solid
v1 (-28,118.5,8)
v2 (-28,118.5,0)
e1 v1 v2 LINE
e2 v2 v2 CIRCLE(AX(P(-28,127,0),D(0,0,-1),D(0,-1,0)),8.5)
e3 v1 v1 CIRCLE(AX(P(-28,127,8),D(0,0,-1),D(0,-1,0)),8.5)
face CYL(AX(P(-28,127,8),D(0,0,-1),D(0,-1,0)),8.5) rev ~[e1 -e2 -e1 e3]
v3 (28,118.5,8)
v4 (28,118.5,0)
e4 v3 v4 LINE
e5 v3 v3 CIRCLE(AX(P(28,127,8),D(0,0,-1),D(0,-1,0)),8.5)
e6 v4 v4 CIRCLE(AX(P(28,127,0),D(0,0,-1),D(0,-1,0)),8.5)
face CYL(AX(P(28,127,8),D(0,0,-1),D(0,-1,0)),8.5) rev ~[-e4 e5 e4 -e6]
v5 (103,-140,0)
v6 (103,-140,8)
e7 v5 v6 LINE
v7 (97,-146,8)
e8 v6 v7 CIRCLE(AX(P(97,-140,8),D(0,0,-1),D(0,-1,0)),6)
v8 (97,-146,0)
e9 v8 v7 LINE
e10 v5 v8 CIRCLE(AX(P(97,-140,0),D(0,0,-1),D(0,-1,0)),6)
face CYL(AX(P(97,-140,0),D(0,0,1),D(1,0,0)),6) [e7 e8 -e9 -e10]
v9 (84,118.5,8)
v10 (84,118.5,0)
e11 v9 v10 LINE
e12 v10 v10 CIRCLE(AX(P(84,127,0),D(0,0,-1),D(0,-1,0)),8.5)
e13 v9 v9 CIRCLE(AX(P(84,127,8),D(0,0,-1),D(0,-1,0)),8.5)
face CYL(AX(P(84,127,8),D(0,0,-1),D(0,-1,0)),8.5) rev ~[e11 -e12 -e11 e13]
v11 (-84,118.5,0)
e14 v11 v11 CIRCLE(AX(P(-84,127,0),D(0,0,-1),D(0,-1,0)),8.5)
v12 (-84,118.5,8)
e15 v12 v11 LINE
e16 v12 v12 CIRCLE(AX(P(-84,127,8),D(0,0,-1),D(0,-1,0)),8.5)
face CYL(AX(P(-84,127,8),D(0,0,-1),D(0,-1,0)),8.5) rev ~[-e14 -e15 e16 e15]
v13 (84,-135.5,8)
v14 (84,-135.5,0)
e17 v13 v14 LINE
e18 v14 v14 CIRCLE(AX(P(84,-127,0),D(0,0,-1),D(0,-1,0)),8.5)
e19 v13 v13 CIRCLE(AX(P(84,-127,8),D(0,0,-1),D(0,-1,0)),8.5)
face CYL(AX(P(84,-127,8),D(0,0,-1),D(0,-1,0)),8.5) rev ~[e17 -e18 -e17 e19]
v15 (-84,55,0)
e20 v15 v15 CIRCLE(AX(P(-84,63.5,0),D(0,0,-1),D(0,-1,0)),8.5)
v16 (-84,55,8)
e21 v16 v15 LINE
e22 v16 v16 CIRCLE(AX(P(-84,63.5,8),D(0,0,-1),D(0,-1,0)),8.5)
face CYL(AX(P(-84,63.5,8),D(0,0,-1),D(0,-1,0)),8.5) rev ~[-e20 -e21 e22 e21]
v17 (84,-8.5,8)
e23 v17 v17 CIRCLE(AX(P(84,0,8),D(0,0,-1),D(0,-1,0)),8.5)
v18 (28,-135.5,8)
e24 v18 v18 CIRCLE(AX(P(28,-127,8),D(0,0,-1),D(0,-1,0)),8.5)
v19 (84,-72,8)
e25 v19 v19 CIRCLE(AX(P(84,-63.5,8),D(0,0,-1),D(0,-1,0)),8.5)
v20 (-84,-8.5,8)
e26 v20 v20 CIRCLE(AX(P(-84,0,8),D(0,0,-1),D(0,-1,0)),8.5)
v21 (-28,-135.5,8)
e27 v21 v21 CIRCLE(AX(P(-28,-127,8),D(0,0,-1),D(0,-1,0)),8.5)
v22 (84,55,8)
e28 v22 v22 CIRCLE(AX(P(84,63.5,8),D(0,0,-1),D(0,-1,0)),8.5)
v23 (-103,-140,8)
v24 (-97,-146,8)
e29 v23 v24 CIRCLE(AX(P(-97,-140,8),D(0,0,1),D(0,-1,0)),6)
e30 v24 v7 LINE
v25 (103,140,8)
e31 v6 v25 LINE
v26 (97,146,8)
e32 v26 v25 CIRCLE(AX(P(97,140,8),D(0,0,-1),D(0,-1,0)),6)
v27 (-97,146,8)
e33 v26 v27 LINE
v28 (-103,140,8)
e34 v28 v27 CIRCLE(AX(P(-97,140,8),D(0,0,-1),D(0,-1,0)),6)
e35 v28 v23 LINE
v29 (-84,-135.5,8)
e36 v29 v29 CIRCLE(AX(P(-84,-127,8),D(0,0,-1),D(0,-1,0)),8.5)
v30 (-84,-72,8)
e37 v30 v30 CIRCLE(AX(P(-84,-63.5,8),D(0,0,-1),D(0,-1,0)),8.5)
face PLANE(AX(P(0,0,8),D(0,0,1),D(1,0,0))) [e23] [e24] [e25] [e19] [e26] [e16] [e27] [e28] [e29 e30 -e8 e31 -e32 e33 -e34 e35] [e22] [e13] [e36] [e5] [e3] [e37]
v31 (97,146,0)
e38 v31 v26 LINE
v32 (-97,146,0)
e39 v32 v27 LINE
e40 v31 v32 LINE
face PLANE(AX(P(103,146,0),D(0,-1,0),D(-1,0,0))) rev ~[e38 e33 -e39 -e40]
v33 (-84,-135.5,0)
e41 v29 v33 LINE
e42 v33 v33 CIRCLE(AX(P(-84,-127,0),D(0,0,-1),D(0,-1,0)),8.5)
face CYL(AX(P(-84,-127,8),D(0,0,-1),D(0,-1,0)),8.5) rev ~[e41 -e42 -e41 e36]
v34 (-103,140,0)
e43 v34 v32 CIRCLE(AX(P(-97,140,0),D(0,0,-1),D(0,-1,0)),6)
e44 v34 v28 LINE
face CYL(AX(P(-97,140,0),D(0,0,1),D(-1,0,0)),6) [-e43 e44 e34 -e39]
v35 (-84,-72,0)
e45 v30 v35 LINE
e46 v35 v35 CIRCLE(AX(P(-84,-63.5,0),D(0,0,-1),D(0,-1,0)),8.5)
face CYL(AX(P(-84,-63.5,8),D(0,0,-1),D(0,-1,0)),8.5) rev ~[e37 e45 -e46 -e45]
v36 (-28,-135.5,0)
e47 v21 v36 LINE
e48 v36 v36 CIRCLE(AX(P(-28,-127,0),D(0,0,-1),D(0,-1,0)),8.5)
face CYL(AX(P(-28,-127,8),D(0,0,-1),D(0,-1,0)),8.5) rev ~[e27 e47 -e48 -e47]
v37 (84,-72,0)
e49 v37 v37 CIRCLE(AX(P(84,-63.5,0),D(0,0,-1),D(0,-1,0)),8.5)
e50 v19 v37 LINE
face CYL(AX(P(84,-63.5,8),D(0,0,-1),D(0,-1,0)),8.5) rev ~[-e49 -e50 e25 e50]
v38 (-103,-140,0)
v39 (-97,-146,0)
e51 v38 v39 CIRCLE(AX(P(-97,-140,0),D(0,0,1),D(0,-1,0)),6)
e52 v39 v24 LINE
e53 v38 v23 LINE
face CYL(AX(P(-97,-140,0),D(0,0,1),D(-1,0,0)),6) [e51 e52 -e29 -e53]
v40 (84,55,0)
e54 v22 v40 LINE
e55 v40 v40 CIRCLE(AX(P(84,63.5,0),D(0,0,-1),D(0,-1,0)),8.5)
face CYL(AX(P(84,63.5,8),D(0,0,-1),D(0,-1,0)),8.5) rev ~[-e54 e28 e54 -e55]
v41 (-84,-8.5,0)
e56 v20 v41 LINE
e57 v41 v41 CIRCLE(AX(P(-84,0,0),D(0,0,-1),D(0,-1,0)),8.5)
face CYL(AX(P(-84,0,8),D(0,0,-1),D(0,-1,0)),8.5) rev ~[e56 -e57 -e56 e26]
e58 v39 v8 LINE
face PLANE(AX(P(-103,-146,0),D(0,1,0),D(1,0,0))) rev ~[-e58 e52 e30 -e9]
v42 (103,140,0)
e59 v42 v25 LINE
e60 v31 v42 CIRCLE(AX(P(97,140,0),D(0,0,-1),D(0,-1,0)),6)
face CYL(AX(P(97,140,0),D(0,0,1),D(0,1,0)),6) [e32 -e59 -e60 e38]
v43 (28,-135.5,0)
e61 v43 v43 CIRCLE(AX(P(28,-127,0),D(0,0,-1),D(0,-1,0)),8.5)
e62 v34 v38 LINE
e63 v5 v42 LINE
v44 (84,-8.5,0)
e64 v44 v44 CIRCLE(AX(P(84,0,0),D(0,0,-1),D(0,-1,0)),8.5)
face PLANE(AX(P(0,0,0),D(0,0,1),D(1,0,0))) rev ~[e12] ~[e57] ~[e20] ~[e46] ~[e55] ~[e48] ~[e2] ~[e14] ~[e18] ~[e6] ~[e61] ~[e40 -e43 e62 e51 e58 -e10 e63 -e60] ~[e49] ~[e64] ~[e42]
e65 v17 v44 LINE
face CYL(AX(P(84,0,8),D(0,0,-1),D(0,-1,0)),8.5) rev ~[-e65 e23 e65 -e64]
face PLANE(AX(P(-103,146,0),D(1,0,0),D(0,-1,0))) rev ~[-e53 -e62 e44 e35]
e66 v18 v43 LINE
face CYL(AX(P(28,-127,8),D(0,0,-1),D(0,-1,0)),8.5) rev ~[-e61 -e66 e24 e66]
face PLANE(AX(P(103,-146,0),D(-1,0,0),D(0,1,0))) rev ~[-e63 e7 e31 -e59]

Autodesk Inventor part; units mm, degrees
ref_plane "YZ Plane" through (0, 0, 0) normal (1, 0, 0) x (0, 1, 0)
ref_plane "XZ Plane" through (0, 0, 0) normal (0, 1, 0) x (-1, 0, 0)
ref_plane "XY Plane" through (0, 0, 0) normal (0, 0, 1) x (1, 0, 0)
sketch "Sketch2" plane through (0, 0, 0) normal (0, 0, 1) x (1, 0, 0)
  line L0 (-53, -96) -> (53, -96)
  line L1 (53, -96) -> (53, 96)
  line L2 (53, 96) -> (-53, 96)
  line L3 (-53, 96) -> (-53, -96)
  line L4 (-53, -96) -> (53, 96) construction
  line L5 (53, -96) -> (-53, 96) construction
  line L6 (-103, -146) -> (103, -146)
  line L7 (103, -146) -> (103, 146)
  line L8 (103, 146) -> (-103, 146)
  line L9 (-103, 146) -> (-103, -146)
  point P0 (0, 0)
  dimension "d31" = 50
  dimension "d60" = 192
  dimension "d61" = 106
extrude "Plate2" add sketch "Sketch2" along normal blind 8 contours L3 L2 L1 L0 | L9 L8 L7 L6
sketch "Sketch5" plane through (0, 0, 8) normal (0, 0, 1) x (1, 0, 0)
  line L0 (103, -146) -> (-103, -146) construction
  line L1 (103, 146) -> (103, -146) construction
  line L2 (-103, 146) -> (103, 146) construction
  line L3 (-103, -146) -> (-103, 146) construction
  line L4 (-84, 127) -> (84, 127) construction
  line L5 (84, 127) -> (84, -127) construction
  line L6 (84, -127) -> (-84, -127) construction
  line L7 (-84, -127) -> (-84, 127) construction
  line L8 (-28, -127) -> (28, -127)
  line L9 (28, -127) -> (28, 127) construction
  line L10 (28, 127) -> (-28, 127)
  line L11 (-28, 127) -> (-28, -127) construction
  line L12 (-28, 0) -> (28, 0) construction
  point P0 (0, 0)
  point P1 (0, -127)
  point P2 (-84, -63.5)
  point P3 (-84, 0)
  point P4 (-84, 63.5)
  point P5 (84, 63.5)
  point P6 (84, 0)
  point P7 (84, -63.5)
  point P8 (0, 0)
  dimension "d34" = 19
  dimension "d47" = 63.5
  dimension "d48" = 63.5
  dimension "d49" = 56
  dimension "d50" = 56
fillet "Corner Round1" radius 6 4 edges at (-103, -146, 4) (-103, 146, 4) (103, 146, 4) (103, -146, 4)
hole "Hole1" at (-84, -127, 8) at (-84, -63.5, 8) at (-84, 0, 8) at (-84, 63.5, 8) at (-84, 127, 8) at (84, 127, 8) at (84, 63.5, 8) at (84, 0, 8) at (84, -63.5, 8) at (84, -127, 8) at (-28, -127, 8) at (28, 127, 8) at (28, -127, 8) at (-28, 127, 8) direction (0, 0, -1) diameter 17 end through all
equation "\"d47\" = d48"
equation "\"d49\" = d50"
equation "\"d60\" = ChargingHatch_width - 2 * Thickness"
equation "\"d61\" = ChargingHatch_hight - 2 * Thickness"
equation "\"d56\" = Thickness"
equation "\"d14\" = Thickness"
equation "\"BendReliefWidth\" = Thickness"
equation "\"BendReliefDepth\" = 0.5 * Thickness"
equation "\"CornerReliefSize\" = 4 * Thickness"
equation "\"MinimumRemnant\" = 2 * Thickness"
equation "\"TransitionRadius\" = BendRadius"
equation "\"JacobiRadiusSize\" = BendRadius"
equation "\"GapSize\" = Thickness"
equation "\"ChargingHatch_width\" = 208"
equation "\"Thickness\" = 8"
equation "\"ChargingHatch_hight\" = 122"
equation "\"BendRadius\" = 6"
properties part number "PRS 9607 charging flange rect_D1200 940" material "Steel"
